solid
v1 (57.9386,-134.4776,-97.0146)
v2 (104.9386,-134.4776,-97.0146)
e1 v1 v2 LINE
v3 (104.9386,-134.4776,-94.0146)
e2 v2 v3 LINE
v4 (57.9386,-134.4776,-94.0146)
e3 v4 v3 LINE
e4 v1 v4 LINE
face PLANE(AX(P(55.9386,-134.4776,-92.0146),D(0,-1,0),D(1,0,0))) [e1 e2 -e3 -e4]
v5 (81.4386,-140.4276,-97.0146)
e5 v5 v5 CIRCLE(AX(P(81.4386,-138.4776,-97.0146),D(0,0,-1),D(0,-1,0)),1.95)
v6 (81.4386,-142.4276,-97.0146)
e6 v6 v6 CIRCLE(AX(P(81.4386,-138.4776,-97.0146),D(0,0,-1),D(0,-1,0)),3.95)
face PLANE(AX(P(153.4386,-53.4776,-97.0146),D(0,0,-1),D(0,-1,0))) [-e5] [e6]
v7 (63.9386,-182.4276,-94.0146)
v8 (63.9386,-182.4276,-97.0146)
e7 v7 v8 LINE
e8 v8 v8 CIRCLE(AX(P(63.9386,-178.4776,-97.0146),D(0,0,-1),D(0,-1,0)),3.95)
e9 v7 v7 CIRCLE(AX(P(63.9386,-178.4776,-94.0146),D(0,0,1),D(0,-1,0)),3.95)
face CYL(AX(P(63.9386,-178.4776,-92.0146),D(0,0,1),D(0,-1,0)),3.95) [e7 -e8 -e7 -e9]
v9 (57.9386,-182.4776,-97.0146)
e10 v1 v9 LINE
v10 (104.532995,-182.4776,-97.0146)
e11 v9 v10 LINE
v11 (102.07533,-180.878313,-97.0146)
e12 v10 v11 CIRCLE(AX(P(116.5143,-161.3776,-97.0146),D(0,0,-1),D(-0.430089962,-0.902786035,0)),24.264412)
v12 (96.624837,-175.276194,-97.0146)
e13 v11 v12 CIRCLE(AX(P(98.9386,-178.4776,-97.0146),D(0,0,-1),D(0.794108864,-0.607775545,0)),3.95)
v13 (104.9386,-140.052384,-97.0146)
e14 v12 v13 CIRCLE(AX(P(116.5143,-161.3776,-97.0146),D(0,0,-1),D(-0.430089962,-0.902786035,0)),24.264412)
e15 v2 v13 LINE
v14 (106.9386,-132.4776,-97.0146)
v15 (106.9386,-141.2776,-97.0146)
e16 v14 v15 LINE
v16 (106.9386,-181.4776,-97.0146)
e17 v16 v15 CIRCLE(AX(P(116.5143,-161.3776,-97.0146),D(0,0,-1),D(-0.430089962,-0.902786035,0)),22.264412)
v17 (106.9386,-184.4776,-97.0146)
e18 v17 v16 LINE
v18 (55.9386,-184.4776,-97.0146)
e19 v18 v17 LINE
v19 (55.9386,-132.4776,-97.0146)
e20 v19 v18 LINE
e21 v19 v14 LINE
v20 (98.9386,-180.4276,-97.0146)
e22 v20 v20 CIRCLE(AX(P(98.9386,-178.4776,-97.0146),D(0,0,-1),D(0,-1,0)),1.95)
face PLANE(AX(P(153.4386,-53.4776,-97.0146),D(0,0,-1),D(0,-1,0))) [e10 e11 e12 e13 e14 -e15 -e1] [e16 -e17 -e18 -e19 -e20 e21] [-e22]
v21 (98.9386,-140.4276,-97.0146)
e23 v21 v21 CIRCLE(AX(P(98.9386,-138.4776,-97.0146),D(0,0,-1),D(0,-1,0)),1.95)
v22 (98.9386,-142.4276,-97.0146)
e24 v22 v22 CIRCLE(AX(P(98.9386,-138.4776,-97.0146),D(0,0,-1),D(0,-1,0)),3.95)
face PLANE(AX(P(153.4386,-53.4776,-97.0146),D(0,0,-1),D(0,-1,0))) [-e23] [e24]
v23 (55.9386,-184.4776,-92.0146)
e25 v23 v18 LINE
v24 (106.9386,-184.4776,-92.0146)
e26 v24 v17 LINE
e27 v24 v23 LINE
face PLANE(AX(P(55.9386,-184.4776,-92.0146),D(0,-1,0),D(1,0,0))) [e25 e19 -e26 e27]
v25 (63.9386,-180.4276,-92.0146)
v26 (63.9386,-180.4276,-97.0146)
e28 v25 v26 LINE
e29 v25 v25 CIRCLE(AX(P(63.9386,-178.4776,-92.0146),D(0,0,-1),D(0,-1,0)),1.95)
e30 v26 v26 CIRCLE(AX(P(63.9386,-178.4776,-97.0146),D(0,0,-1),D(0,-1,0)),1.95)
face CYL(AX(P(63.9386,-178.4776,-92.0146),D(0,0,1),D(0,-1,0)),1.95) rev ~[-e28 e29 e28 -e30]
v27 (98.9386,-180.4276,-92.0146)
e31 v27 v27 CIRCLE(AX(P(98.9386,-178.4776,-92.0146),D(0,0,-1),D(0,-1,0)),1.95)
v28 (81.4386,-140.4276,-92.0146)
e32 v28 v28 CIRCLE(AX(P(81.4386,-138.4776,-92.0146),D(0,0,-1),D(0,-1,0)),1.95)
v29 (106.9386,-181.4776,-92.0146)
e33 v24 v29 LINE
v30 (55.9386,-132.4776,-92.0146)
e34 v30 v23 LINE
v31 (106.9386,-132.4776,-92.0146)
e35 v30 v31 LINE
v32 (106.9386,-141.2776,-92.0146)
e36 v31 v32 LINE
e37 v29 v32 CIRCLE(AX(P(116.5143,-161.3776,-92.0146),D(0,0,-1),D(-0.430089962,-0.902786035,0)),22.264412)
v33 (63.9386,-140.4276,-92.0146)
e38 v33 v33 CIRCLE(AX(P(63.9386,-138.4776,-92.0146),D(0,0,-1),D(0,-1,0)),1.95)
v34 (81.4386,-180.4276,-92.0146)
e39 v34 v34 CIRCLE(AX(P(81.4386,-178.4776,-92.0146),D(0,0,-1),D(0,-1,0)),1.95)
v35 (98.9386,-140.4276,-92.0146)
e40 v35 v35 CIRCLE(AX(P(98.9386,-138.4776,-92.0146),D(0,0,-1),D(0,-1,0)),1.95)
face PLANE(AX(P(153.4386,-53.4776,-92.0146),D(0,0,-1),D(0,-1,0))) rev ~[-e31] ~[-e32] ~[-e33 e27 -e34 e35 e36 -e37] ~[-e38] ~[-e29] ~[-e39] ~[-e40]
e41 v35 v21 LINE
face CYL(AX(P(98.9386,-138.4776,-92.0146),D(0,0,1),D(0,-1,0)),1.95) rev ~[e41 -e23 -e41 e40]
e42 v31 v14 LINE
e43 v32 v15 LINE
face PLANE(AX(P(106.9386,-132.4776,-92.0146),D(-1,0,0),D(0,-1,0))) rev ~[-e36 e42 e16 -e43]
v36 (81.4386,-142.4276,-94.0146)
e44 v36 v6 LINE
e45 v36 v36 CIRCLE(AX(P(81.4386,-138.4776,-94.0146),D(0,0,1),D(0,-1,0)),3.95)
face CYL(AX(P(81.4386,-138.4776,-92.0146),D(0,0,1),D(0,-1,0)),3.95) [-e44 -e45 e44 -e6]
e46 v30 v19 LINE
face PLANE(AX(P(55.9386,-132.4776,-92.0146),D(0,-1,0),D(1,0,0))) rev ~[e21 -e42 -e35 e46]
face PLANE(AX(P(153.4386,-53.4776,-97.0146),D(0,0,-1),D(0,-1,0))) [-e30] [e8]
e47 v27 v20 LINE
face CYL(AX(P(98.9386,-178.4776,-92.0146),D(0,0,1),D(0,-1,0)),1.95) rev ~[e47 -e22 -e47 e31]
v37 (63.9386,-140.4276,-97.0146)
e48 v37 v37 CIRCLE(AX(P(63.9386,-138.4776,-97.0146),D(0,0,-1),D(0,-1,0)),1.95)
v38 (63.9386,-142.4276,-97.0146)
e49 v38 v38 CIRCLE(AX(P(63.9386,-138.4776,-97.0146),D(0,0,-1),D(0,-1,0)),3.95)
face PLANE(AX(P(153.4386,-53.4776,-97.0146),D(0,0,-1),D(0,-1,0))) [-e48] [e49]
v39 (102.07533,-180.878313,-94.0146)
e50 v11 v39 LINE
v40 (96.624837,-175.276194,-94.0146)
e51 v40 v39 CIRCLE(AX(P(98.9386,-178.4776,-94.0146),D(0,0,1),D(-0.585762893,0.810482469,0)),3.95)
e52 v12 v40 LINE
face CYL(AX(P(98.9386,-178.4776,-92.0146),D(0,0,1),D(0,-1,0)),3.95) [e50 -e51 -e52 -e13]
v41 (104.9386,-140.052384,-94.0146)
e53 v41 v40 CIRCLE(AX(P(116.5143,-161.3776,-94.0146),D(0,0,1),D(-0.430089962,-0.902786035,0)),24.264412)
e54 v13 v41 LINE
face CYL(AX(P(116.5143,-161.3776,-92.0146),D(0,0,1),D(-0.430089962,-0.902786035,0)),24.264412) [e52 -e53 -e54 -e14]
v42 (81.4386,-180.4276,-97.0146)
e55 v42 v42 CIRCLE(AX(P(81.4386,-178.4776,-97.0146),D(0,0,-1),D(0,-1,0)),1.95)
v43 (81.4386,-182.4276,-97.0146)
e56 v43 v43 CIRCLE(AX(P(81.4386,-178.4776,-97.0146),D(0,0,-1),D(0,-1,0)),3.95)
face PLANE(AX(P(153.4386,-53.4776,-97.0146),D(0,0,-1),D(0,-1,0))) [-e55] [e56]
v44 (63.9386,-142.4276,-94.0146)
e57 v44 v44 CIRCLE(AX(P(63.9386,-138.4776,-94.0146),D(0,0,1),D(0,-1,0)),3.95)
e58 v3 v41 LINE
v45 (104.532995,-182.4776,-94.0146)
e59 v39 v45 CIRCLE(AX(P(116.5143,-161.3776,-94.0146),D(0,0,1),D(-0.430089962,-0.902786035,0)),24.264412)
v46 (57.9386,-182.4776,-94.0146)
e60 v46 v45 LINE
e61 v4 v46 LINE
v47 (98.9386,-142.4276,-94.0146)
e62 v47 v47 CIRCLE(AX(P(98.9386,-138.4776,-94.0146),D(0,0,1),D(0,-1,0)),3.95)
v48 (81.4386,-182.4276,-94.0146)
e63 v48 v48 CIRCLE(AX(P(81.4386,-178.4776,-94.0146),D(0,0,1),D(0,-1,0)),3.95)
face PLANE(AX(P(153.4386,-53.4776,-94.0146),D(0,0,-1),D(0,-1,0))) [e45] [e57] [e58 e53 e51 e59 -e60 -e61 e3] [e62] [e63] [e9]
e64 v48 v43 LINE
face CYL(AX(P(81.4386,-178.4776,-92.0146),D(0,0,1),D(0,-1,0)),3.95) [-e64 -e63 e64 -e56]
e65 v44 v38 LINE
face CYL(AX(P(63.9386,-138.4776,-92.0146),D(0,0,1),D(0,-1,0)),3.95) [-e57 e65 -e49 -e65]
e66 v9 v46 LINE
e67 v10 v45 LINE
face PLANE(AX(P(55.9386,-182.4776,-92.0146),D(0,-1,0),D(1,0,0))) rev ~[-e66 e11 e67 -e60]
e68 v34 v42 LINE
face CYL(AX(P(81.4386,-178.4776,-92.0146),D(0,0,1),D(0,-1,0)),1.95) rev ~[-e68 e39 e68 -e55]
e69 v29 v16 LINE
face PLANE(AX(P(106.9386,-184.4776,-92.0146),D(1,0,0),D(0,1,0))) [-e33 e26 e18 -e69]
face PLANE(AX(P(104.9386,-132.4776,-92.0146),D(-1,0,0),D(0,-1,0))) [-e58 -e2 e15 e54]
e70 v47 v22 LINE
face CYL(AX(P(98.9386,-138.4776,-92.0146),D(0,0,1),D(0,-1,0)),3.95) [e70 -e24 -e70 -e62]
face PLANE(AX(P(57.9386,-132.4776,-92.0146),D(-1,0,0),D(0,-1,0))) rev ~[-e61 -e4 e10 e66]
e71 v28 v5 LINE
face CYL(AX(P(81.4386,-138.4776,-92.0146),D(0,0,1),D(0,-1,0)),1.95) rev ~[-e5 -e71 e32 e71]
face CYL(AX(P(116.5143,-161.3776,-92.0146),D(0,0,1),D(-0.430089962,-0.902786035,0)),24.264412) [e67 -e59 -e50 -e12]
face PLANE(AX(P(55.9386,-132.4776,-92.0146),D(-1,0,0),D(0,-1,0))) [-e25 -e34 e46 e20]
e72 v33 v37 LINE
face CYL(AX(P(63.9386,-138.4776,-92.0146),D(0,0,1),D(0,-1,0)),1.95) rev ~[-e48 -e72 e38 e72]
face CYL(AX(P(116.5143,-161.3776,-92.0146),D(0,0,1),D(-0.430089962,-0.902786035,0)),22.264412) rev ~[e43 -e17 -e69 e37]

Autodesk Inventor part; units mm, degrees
ref_plane "YZ Plane" through (0, 0, 0) normal (1, 0, 0) x (0, 1, 0)
ref_plane "XZ Plane" through (0, 0, 0) normal (0, 1, 0) x (-1, 0, 0)
ref_plane "XY Plane" through (0, 0, 0) normal (0, 0, 1) x (1, 0, 0)
ref_plane "Work Plane2" through (153.4386, -53.4776, -92.0146) normal (0, 0, -1) x (0, -1, 0)
sketch "Sketch2" plane through (153.4386, -53.4776, -92.0146) normal (0, 0, -1) x (0, -1, 0)
  line L0 (93.2, 97.5) -> (213.5, 97.5) construction
  line L1 (40, 105.5) -> (170, 105.5) construction
  line L2 (-3.5, 97.5) -> (93.2, 97.5) construction
  line L3 (40, 105.5) -> (170, 105.5) construction
  line L4 (0.0695, 95.5) -> (93.2, 95.5) construction
  line L5 (93.2, 95.5) -> (209.9305, 95.5) construction
  arc A0 (93.2, 56.229) -> (86.5748, 48.5) centre (107.9, 36.9243) ccw construction
  line L6 (93.2, 95.5) -> (93.2, 56.229) construction
  arc A1 (120.0681, 57.9171) -> (93.2, 56.229) centre (107.9, 36.9243) ccw construction
  arc A2 (128.5511, 49.6637) -> (120.0681, 57.9171) centre (125, 54.5) ccw construction
  arc A3 (129.2252, 48.5) -> (128.5511, 49.6637) centre (107.9, 36.9243) ccw construction
  line L7 (134.8038, 48.5) -> (129.2252, 48.5) construction
  arc A4 (145.1962, 48.5) -> (134.8038, 48.5) centre (140, 51.5) ccw construction
  line L8 (159.8038, 48.5) -> (145.1962, 48.5) construction
  arc A5 (170.1962, 48.5) -> (159.8038, 48.5) centre (165, 51.5) ccw construction
  line L9 (184.8038, 48.5) -> (170.1962, 48.5) construction
  arc A6 (195.1962, 48.5) -> (184.8038, 48.5) centre (190, 51.5) ccw construction
  line L10 (198.5, 48.5) -> (195.1962, 48.5) construction
  arc A7 (204.5, 42.5) -> (198.5, 48.5) centre (198.5, 42.5) ccw construction
  line L11 (204.5, -42.5) -> (204.5, 42.5) projected
  arc A8 (204.5, -42.5) -> (206.5, -44.5) centre (206.5, -42.5) ccw projected
  line L12 (207.3038, -44.5) -> (206.5, -44.5) projected
  arc A9 (215.5, -36.3038) -> (207.3038, -44.5) centre (212.5, -41.5) ccw projected
  line L13 (215.5, 87.3038) -> (215.5, -36.3038) construction
  arc A10 (207.3038, 95.5) -> (215.5, 87.3038) centre (212.5, 92.5) ccw construction
  line L14 (125, 95.5) -> (207.3038, 95.5) construction
  circle A11 centre (125, 89.5) radius 6 construction
  line L15 (93.2, 95.5) -> (125, 95.5) construction
  circle A12 centre (125, 72) radius 6 construction
  circle A13 centre (190, 76.5) radius 6 construction
  circle A14 centre (140, 76.5) radius 6 construction
  arc A15 (93.2, 53.646) -> (87.8, 46.5) centre (107.9, 36.9243) ccw construction
  arc A16 (128, 46.5) -> (93.2, 53.646) centre (107.9, 36.9243) ccw construction
  circle A17 centre (85, 89.5) radius 6 construction
  circle A18 centre (125, 89.5) radius 6 construction
  line L16 (79, 97.5) -> (79, 46.5)
  line L17 (79, 46.5) -> (87.8, 46.5)
  line L18 (79, 97.5) -> (131, 97.5)
  line L19 (131, 97.5) -> (131, 48.5)
  line L20 (131, 48.5) -> (131, 46.5)
  line L21 (131, 46.5) -> (128, 46.5)
  arc A19 (128, 46.5) -> (87.8, 46.5) centre (107.9, 36.9243) ccw
  circle A20 centre (85, 54.5) radius 1.95 projected
  circle A21 centre (85, 72) radius 1.95 projected
  circle A22 centre (85, 89.5) radius 1.95 projected
  circle A23 centre (125, 89.5) radius 1.95 projected
  circle A24 centre (125, 72) radius 1.95 projected
  circle A25 centre (125, 54.5) radius 1.95 projected
  point P0 (-53.4776, 153.4386)
extrude "Extrusion2" add sketch "Sketch2" along normal blind 5
shell "Shell2" thickness 2 removed faces 1 at (70.074, -152.3865, -97.0146)
properties part number "02_Zeiss_Axiotech_adapterplate_rightleft_connector"
